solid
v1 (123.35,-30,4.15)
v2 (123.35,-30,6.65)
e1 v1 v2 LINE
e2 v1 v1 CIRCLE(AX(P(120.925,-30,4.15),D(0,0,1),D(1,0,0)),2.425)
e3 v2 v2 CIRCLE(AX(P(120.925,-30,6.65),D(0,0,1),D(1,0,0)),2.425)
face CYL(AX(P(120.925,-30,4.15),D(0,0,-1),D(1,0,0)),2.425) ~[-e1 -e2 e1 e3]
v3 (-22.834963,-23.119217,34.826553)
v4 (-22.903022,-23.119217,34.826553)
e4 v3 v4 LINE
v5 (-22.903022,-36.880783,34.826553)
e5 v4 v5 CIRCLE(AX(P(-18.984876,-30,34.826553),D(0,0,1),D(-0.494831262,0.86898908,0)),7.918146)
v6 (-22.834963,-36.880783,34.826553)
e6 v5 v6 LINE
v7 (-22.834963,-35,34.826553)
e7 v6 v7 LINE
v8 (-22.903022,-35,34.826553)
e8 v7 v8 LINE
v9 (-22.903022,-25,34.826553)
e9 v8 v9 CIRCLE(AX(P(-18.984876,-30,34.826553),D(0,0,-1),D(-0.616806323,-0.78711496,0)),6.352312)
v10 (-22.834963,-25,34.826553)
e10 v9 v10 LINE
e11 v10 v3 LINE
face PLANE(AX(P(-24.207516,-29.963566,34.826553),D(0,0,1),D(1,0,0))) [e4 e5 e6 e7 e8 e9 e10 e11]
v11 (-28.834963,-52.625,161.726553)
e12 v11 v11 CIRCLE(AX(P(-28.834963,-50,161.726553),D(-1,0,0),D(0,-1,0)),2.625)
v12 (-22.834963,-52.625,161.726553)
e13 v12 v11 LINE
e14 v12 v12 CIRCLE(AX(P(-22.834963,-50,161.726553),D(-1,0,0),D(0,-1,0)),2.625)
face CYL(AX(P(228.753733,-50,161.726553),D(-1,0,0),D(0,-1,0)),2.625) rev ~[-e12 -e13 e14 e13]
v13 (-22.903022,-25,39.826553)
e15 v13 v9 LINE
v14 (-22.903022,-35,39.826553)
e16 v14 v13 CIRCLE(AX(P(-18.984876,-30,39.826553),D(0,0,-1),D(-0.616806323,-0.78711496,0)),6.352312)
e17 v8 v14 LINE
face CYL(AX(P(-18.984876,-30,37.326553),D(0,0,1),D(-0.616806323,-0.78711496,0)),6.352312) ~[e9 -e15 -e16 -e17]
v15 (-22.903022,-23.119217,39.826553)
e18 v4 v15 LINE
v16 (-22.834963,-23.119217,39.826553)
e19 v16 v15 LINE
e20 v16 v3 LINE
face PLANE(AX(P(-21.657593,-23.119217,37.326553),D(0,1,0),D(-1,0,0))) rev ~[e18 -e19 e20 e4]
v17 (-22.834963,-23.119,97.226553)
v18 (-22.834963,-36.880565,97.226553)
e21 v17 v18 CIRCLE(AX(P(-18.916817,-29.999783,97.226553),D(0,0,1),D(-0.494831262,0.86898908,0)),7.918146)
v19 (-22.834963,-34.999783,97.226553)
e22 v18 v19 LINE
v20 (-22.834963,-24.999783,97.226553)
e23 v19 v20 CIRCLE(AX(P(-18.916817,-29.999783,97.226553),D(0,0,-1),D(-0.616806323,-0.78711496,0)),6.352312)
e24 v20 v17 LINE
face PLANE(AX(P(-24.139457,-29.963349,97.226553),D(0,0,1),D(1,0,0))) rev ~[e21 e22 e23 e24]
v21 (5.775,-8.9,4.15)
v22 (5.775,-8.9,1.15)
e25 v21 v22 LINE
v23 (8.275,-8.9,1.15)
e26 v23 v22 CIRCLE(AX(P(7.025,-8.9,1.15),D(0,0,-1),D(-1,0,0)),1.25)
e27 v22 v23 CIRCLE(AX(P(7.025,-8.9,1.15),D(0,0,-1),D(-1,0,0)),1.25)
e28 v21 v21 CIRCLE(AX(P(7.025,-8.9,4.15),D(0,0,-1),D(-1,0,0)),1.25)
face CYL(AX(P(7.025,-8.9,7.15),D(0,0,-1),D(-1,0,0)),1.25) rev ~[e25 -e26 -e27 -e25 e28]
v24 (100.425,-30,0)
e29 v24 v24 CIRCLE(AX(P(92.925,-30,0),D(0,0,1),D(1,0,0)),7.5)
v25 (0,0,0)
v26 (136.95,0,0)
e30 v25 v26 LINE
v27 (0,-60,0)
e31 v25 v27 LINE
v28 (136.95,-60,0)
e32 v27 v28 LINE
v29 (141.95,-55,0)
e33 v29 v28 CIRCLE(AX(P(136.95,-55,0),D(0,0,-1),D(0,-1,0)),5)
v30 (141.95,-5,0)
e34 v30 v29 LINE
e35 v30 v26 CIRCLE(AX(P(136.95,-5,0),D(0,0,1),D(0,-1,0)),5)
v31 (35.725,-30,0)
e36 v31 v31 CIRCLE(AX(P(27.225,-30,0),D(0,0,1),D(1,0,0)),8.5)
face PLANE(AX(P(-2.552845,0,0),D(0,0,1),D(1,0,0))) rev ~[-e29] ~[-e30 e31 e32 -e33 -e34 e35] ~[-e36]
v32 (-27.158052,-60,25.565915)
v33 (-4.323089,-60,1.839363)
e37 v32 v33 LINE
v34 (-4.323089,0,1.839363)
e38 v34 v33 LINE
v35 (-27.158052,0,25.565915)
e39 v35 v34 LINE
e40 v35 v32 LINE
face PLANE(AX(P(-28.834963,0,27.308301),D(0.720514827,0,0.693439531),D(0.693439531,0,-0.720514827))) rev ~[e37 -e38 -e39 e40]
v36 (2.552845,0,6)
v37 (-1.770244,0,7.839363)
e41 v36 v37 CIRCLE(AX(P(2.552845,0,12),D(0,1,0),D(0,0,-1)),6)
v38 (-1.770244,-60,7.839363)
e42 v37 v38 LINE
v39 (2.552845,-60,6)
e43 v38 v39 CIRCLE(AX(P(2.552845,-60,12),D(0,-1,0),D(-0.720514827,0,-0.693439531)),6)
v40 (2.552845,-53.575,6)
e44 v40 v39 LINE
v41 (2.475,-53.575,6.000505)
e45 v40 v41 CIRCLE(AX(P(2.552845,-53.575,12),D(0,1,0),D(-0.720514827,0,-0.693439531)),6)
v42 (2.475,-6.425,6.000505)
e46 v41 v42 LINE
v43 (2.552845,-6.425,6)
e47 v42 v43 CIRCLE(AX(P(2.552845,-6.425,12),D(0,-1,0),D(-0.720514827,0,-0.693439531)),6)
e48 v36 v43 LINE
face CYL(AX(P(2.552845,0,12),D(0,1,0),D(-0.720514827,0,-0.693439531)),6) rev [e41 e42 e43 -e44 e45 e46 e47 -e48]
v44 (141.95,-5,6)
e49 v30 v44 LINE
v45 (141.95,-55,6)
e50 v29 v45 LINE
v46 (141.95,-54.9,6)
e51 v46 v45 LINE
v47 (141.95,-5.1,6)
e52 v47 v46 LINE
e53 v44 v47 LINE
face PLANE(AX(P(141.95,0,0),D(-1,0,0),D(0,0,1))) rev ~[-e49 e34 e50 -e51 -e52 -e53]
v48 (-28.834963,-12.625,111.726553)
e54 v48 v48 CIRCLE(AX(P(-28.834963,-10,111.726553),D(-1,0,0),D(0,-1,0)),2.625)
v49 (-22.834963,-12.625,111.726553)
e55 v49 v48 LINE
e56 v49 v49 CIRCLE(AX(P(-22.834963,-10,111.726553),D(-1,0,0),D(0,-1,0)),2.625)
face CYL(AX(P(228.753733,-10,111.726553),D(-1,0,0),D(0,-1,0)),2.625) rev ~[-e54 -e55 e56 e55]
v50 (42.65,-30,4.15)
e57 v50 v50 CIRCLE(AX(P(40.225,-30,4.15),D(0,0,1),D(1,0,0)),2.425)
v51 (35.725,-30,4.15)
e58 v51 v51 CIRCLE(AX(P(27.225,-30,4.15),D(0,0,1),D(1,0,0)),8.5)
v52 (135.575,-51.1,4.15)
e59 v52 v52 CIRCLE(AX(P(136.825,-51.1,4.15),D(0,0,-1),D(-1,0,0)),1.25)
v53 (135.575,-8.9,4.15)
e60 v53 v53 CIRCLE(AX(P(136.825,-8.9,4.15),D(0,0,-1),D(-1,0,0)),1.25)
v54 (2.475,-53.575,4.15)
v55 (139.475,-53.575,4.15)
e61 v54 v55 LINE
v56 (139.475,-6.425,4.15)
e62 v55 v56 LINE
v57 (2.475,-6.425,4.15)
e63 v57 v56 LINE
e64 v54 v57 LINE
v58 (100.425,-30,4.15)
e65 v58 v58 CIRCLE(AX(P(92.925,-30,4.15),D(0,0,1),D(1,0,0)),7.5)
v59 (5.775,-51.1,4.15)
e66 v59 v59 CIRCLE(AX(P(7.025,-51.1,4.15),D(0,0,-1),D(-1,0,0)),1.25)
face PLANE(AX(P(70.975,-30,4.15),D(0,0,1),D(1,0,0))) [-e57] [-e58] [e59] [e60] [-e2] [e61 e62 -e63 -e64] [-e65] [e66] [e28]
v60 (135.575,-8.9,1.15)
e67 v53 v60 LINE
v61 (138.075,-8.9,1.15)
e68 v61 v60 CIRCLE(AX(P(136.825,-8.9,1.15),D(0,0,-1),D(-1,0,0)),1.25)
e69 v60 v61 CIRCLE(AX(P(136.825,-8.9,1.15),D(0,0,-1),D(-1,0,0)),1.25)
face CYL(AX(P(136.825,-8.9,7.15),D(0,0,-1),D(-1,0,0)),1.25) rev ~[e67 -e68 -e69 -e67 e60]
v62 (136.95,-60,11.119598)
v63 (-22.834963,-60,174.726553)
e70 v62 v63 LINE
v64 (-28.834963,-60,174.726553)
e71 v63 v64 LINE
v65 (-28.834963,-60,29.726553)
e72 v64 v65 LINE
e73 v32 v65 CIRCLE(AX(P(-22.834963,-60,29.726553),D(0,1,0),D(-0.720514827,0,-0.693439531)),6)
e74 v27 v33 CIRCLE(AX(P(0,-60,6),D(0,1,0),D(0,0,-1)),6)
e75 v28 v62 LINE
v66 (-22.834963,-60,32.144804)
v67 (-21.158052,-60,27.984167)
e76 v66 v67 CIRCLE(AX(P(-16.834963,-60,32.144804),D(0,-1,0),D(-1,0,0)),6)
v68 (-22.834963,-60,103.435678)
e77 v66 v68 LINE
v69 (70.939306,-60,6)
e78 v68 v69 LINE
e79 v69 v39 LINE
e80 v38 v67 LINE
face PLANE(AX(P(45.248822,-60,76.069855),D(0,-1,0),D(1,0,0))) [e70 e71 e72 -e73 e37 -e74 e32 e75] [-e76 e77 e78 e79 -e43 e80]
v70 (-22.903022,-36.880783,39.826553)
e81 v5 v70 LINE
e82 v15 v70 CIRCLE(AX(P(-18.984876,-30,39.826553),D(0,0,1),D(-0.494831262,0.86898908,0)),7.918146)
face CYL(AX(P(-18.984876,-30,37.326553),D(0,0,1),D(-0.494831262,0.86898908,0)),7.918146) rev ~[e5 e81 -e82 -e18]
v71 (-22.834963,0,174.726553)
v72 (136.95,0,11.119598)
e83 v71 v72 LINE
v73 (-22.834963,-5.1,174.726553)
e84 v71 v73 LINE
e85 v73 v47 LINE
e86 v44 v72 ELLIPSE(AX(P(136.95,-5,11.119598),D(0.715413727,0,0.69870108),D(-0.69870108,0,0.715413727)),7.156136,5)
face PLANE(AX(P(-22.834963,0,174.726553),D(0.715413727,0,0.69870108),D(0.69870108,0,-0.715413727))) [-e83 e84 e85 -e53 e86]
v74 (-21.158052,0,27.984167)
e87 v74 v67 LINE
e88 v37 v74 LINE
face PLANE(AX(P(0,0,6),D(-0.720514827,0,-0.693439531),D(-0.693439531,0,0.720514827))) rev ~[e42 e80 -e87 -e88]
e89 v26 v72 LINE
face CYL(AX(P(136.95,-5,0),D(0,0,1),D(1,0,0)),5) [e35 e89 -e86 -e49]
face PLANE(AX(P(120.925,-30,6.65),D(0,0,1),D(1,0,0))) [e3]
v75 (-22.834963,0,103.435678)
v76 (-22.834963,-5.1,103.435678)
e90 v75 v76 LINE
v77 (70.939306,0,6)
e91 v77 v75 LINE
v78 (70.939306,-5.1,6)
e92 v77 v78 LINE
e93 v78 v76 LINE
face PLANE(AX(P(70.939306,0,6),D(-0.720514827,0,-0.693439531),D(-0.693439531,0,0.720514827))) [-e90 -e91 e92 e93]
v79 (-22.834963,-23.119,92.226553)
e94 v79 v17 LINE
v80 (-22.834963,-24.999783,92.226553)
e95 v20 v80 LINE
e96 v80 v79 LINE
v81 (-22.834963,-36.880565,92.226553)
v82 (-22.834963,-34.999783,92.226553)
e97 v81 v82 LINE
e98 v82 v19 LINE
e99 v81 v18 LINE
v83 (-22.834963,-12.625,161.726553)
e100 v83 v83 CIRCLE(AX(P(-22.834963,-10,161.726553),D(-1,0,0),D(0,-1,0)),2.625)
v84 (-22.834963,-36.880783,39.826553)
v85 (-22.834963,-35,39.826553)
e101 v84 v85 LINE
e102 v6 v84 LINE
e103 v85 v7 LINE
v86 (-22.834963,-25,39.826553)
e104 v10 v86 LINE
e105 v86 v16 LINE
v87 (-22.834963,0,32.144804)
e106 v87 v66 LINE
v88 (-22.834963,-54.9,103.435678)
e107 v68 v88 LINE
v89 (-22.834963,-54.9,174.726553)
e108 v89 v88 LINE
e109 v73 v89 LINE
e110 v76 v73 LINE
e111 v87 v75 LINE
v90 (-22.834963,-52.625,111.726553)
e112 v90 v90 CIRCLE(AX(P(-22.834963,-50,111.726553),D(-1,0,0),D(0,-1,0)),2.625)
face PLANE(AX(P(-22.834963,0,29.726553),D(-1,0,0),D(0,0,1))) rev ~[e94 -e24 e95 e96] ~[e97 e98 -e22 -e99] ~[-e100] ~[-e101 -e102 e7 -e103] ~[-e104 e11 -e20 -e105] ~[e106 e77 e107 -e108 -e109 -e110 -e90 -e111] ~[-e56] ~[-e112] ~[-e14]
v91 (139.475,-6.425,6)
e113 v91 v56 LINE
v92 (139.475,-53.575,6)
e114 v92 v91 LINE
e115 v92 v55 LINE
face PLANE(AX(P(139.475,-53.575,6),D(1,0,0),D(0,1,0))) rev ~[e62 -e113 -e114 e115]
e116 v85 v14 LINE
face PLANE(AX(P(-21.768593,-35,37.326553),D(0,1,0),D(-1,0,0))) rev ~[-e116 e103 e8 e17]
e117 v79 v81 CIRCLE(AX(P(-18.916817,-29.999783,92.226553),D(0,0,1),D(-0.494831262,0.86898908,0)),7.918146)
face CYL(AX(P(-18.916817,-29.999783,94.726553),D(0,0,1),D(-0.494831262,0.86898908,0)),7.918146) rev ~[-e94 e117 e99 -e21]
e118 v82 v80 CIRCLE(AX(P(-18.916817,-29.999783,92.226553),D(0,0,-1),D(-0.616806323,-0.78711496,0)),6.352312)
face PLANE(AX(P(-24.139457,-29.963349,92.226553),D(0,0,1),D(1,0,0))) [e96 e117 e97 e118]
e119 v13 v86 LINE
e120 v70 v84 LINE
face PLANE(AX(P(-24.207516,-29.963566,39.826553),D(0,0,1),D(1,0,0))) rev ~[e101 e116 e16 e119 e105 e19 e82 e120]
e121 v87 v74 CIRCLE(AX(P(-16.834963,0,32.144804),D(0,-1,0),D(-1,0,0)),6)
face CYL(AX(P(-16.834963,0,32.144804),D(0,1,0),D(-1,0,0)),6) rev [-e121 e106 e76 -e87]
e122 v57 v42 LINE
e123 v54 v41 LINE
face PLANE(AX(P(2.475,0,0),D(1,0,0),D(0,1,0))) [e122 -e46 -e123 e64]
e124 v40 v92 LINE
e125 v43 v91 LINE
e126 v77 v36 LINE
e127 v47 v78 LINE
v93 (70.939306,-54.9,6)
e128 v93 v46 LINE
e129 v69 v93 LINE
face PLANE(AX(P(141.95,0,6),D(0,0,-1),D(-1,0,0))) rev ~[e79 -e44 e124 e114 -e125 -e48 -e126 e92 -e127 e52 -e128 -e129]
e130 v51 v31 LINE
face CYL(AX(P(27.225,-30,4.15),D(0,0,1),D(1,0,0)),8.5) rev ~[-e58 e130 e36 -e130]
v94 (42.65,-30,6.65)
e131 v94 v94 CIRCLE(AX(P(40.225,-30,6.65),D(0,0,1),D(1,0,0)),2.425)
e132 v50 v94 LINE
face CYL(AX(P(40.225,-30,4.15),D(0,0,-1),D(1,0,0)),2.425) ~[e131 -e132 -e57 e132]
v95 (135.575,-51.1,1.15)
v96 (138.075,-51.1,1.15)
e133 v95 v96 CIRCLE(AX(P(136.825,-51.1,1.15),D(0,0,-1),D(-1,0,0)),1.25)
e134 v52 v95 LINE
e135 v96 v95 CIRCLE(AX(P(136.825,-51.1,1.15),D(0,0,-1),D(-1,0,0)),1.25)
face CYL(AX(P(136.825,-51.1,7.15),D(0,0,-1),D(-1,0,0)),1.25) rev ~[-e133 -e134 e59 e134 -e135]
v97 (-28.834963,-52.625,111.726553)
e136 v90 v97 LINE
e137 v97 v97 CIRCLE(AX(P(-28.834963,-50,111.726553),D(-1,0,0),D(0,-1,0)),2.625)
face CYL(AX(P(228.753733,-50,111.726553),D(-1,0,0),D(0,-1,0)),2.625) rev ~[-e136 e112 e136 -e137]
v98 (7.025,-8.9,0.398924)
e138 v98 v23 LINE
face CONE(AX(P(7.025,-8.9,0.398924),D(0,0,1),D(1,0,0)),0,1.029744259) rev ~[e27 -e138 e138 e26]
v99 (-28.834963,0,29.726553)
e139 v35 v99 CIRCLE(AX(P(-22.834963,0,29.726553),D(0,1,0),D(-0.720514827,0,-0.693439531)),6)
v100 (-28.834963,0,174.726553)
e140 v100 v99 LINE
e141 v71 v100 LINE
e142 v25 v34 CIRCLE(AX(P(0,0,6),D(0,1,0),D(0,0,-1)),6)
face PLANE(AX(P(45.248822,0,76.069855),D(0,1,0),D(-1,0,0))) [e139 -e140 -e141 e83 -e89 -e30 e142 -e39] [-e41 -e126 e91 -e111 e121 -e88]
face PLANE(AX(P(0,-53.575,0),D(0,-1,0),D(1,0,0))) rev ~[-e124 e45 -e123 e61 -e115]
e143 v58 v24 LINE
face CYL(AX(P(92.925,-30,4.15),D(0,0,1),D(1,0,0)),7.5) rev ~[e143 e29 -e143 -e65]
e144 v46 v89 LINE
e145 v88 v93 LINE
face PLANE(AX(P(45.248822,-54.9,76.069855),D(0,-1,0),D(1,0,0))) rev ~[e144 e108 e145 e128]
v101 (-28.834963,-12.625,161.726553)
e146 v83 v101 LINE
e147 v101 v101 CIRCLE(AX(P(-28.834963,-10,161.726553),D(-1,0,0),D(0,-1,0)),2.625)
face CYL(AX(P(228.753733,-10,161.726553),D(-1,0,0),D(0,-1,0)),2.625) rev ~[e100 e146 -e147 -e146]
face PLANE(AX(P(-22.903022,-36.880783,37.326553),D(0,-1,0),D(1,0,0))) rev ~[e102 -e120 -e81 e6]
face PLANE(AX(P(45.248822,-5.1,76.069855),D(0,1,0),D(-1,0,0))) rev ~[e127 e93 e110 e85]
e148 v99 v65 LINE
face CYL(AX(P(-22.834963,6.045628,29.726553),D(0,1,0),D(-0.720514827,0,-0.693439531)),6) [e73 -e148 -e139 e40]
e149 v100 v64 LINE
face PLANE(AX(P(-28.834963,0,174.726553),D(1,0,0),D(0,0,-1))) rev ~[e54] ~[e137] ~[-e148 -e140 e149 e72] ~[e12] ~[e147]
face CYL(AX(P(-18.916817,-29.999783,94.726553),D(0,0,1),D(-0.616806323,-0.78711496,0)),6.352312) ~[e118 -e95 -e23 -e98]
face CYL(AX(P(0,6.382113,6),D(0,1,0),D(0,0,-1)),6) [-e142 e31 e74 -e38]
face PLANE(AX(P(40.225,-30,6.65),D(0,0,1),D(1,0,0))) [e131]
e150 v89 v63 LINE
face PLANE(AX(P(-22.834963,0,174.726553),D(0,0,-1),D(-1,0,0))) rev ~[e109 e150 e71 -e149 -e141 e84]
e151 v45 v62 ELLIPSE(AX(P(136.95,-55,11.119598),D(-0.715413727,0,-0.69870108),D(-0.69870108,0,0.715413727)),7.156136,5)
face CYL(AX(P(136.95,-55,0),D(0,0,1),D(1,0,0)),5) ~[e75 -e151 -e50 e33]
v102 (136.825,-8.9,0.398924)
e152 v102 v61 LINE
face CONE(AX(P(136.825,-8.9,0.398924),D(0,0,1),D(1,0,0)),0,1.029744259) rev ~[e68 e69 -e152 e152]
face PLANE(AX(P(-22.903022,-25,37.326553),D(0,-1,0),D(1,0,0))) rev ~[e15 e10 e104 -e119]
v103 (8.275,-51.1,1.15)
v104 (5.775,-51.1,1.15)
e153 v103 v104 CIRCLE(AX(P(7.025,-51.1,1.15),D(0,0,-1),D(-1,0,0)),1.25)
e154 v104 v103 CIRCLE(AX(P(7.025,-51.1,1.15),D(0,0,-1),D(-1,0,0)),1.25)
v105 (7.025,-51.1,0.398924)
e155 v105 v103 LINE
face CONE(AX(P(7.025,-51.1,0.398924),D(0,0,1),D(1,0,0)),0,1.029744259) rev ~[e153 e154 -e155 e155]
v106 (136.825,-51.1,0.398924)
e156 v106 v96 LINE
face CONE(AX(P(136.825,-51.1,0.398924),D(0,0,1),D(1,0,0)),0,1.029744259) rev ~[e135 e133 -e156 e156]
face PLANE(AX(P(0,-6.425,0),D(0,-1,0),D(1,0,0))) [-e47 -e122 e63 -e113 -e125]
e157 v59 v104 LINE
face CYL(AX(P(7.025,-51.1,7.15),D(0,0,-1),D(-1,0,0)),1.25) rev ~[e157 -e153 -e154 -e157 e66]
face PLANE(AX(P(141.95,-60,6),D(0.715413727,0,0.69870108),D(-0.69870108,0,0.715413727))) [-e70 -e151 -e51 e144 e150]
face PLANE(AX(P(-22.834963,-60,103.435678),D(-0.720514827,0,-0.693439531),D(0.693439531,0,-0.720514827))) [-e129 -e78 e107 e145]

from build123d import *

# Parameters (mm, degrees)
F1_DEPTH     = 60
F2_W         = 137
F2_H         = 47.15
F3_DEPTH     = 1.85
F5_D         = 2.5
F5_DEPTH     = 3
F5_TIP       = 0.7510757738
F4_R         = 2.425
F6_DEPTH     = 2.5
F8_D         = 5.25
F9_T1_DEPTH  = 60
F9_T6_DEPTH  = 60
F9_T12_DEPTH = 60
F9_T18_DEPTH = 60
F9_T25_DEPTH = 60
F9_T31_DEPTH = 60
F9_T34_DEPTH = 72.0912564168
F9_T36_DEPTH = 72.7642259517
F4_R_2       = 8.5
F4_R_3       = 7.5
F10_DEPTH    = 25
F12_DEPTH    = 5.1
F14_DEPTH    = 5.1
F15_R        = 5
F18_DEPTH    = 2.5
F21_DEPTH    = 2.5


# Not quite as in the source:
# - a fillet or chamfer that OpenCascade refuses, or shapes differently, is made with other operations: its cross-section is extruded or revolved along the edge and cut away or added
# - a feature names something its author has since deleted; it is built from what else it names


with BuildPart() as f1:
    # F0 (on Front) → F1 (new body)
    with BuildSketch(Plane.XZ):
        Polygon((-22.8349631621, 174.7265526258), (-28.8349631621, 174.7265526258), (-28.8349631621, 29.7265526258), (-28.8349631621, 27.3083013424), (-2.5528451903, 0), (0, 0), (141.95, 0), (141.95, 6), (0, 6), (-22.8349631621, 29.7265526258), (-22.8349631621, 151.506786451), align=None)
    extrude(amount=F1_DEPTH)

    # F2 (on face) → F3 (cut)
    with BuildSketch(Plane.XY.offset(6)):
        with Locations((70.975, -30)):
            Rectangle(F2_W, F2_H)
    extrude(amount=-F3_DEPTH, mode=Mode.SUBTRACT)

    # F5
    with Locations(Plane.XY.offset(4.15)):
        with Locations((7.025, -8.9), (136.825, -8.9), (136.825, -51.1), (7.025, -51.1)):
            Hole(F5_D / 2, depth=F5_DEPTH)
            with Locations((0, 0, -(F5_DEPTH + F5_TIP / 2))):  # 118° drill point
                Cone(0, F5_D / 2, F5_TIP, mode=Mode.SUBTRACT)

    # F4 (on face) → F6 (join)
    with BuildSketch(Plane.XY.offset(4.15)):
        with Locations((40.225, -30)):
            Circle(F4_R)
        with Locations((120.925, -30)):
            Circle(F4_R)
    extrude(amount=F6_DEPTH)

    # F8 (through all)
    with Locations(Plane.YZ.offset(-22.8349631621)):
        with Locations((-50, 161.7265526258), (-10, 161.7265526258), (-10, 111.7265526258), (-50, 111.7265526258)):
            Hole(F8_D / 2)

    # F9: fillet of radius 6 on 4 edges, made by hand

    # F9_s2 → F9_t1 (join)
    with BuildSketch(Plane.XZ):
        with BuildLine():
            ThreePointArc((-22.8349631621, 32.1448039092), (-22.3999669258, 29.9018743269), (-21.1580521252, 27.9841667203))
            Line((-21.1580521252, 27.9841667203), (-22.8349631621, 29.7265526258))
            Line((-22.8349631621, 29.7265526258), (-22.8349631621, 32.1448039092))
        make_face()
    extrude(amount=F9_T1_DEPTH)


with BuildPart() as f9_tool4:
    # F9_s5 → F9_t6 (new body)
    with BuildSketch(Plane.XZ):
        with BuildLine():
            ThreePointArc((-1.7702437727, 7.8393628111), (0.2037840091, 6.4789573841), (2.5528451903, 6))
            Line((2.5528451903, 6), (0, 6))
            Line((0, 6), (-1.7702437727, 7.8393628111))
        make_face()
    extrude(amount=F9_T6_DEPTH)

    split(bisect_by=Plane.YZ.offset(2.475), keep=Keep.BOTTOM)

    split(bisect_by=Plane.XZ.offset(6.425), keep=Keep.BOTTOM)


with BuildPart() as f1_1:
    add(f1.part)

    # F9_t3: union F9_tool4
    add(f9_tool4.part)


with BuildPart() as f9_tool10:
    # F9_s11 → F9_t12 (new body)
    with BuildSketch(Plane.XZ):
        with BuildLine():
            ThreePointArc((-1.7702437727, 7.8393628111), (0.2037840091, 6.4789573841), (2.5528451903, 6))
            Line((2.5528451903, 6), (0, 6))
            Line((0, 6), (-1.7702437727, 7.8393628111))
        make_face()
    extrude(amount=F9_T12_DEPTH)

    split(bisect_by=Plane.YZ.offset(2.475), keep=Keep.TOP)

    split(bisect_by=Plane.XZ.offset(6.425), keep=Keep.BOTTOM)


with BuildPart() as f1_2:
    add(f1_1.part)

    # F9_t9: union F9_tool10
    add(f9_tool10.part)


with BuildPart() as f9_tool16:
    # F9_s17 → F9_t18 (new body)
    with BuildSketch(Plane.XZ):
        with BuildLine():
            ThreePointArc((-1.7702437727, 7.8393628111), (0.2037840091, 6.4789573841), (2.5528451903, 6))
            Line((2.5528451903, 6), (0, 6))
            Line((0, 6), (-1.7702437727, 7.8393628111))
        make_face()
    extrude(amount=F9_T18_DEPTH)

    split(bisect_by=Plane.XZ.offset(53.575), keep=Keep.BOTTOM)

    split(bisect_by=Plane.YZ.offset(2.475), keep=Keep.BOTTOM)

    split(bisect_by=Plane.XZ.offset(6.425), keep=Keep.TOP)


with BuildPart() as f1_3:
    add(f1_2.part)

    # F9_t15: union F9_tool16
    add(f9_tool16.part)


with BuildPart() as f9_tool23:
    # F9_s24 → F9_t25 (new body)
    with BuildSketch(Plane.XZ):
        with BuildLine():
            ThreePointArc((-1.7702437727, 7.8393628111), (0.2037840091, 6.4789573841), (2.5528451903, 6))
            Line((2.5528451903, 6), (0, 6))
            Line((0, 6), (-1.7702437727, 7.8393628111))
        make_face()
    extrude(amount=F9_T25_DEPTH)

    split(bisect_by=Plane.XZ.offset(53.575), keep=Keep.TOP)

    split(bisect_by=Plane.YZ.offset(2.475), keep=Keep.BOTTOM)


with BuildPart() as f1_4:
    add(f1_3.part)

    # F9_t22: union F9_tool23
    add(f9_tool23.part)


with BuildPart() as f9_tool29:
    # F9_s30 → F9_t31 (new body)
    with BuildSketch(Plane.XZ):
        with BuildLine():
            ThreePointArc((-1.7702437727, 7.8393628111), (0.2037840091, 6.4789573841), (2.5528451903, 6))
            Line((2.5528451903, 6), (0, 6))
            Line((0, 6), (-1.7702437727, 7.8393628111))
        make_face()
    extrude(amount=F9_T31_DEPTH)

    split(bisect_by=Plane.XZ.offset(53.575), keep=Keep.TOP)

    split(bisect_by=Plane.YZ.offset(2.475), keep=Keep.TOP)


with BuildPart() as f1_5:
    add(f1_4.part)

    # F9_t28: union F9_tool29
    add(f9_tool29.part)

    # F9_s35 → F9_t34 (cut)
    with BuildSketch(Plane.XZ.offset(-6.0456282084)):
        with BuildLine():
            ThreePointArc((-27.1580521252, 25.5659154369), (-28.3999669258, 27.4836230436), (-28.8349631621, 29.7265526258))
            Line((-28.8349631621, 29.7265526258), (-28.8349631621, 27.3083013424))
            Line((-28.8349631621, 27.3083013424), (-27.1580521252, 25.5659154369))
        make_face()
    extrude(amount=F9_T34_DEPTH, mode=Mode.SUBTRACT)

    # F9_s37 → F9_t36 (cut)
    with BuildSketch(Plane.XZ.offset(-6.3821129759)):
        with BuildLine():
            ThreePointArc((0, 0), (-2.3490611813, 0.4789573841), (-4.3230889631, 1.8393628111))
            Line((-4.3230889631, 1.8393628111), (-2.5528451903, 0))
            Line((-2.5528451903, 0), (0, 0))
        make_face()
    extrude(amount=F9_T36_DEPTH, mode=Mode.SUBTRACT)

    # F4 (on face) → F10 (cut)
    with BuildSketch(Plane.XY.offset(4.15)):
        with Locations((27.225, -30)):
            Circle(F4_R_2)
        with Locations((92.925, -30)):
            Circle(F4_R_3)
    extrude(amount=-F10_DEPTH, mode=Mode.SUBTRACT)

    # F11 (on face) → F12 (join)
    with BuildSketch(Plane(origin=(0, 0, 0), x_dir=(-1, 0, 0), z_dir=(0, 1, 0))):
        Polygon((22.8349631621, 103.4356782675), (22.8349631621, 174.7265526258), (-141.95, 6), (-70.9393056499, 6), align=None)
    extrude(amount=-F12_DEPTH)

    # F13 (on face) → F14 (join)
    with BuildSketch(Plane.XZ.offset(60)):
        Polygon((141.95, 6), (-22.8349631621, 174.7265526258), (-22.8349631621, 103.4356782675), (70.9393056499, 6), align=None)
    extrude(amount=-F14_DEPTH)

    # F15
    f15_edges = [f1_5.edges().sort_by_distance(p)[0] for p in [
        (141.95, -60, 3),
        (141.95, 0, 3),
    ]]
    fillet(f15_edges, radius=F15_R)

    # F17 (on line) → F18 (cut, symmetric)
    with BuildSketch(Plane.XY.offset(94.7265526258)):
        with BuildLine():
            Line((-21.5895338884, -23.119), (-22.8349631621, -23.119))
            ThreePointArc((-22.8349631621, -23.119), (-26.8349631621, -29.9997827216), (-22.8349631621, -36.8805654433))
            Line((-22.8349631621, -36.8805654433), (-21.7005347336, -36.8805654433))
            Line((-21.7005347336, -36.8805654433), (-21.7005347336, -34.9997827216))
            Line((-21.7005347336, -34.9997827216), (-22.8349631621, -34.9997827216))
            ThreePointArc((-22.8349631621, -34.9997827216), (-25.2691290512, -29.9997827216), (-22.8349631621, -24.9997827216))
            Line((-22.8349631621, -24.9997827216), (-21.5895338884, -24.9997827216))
            Line((-21.5895338884, -24.9997827216), (-21.5895338884, -23.119))
        make_face()
    extrude(amount=F18_DEPTH, both=True, mode=Mode.SUBTRACT)

    # F20 (on offset) → F21 (cut, symmetric)
    with BuildSketch(Plane.XY.offset(37.3265526258)):
        with BuildLine():
            Line((-21.657592603, -23.1192172784), (-22.9030218767, -23.1192172784))
            ThreePointArc((-22.9030218767, -23.1192172784), (-26.9030218767, -30), (-22.9030218767, -36.8807827216))
            Line((-22.9030218767, -36.8807827216), (-21.7685934482, -36.8807827216))
            Line((-21.7685934482, -36.8807827216), (-21.7685934482, -35))
            Line((-21.7685934482, -35), (-22.9030218767, -35))
            ThreePointArc((-22.9030218767, -35), (-25.3371877657, -30), (-22.9030218767, -25))
            Line((-22.9030218767, -25), (-21.657592603, -25))
            Line((-21.657592603, -25), (-21.657592603, -23.1192172784))
        make_face()
    extrude(amount=F21_DEPTH, both=True, mode=Mode.SUBTRACT)


solid = f1_5.part
